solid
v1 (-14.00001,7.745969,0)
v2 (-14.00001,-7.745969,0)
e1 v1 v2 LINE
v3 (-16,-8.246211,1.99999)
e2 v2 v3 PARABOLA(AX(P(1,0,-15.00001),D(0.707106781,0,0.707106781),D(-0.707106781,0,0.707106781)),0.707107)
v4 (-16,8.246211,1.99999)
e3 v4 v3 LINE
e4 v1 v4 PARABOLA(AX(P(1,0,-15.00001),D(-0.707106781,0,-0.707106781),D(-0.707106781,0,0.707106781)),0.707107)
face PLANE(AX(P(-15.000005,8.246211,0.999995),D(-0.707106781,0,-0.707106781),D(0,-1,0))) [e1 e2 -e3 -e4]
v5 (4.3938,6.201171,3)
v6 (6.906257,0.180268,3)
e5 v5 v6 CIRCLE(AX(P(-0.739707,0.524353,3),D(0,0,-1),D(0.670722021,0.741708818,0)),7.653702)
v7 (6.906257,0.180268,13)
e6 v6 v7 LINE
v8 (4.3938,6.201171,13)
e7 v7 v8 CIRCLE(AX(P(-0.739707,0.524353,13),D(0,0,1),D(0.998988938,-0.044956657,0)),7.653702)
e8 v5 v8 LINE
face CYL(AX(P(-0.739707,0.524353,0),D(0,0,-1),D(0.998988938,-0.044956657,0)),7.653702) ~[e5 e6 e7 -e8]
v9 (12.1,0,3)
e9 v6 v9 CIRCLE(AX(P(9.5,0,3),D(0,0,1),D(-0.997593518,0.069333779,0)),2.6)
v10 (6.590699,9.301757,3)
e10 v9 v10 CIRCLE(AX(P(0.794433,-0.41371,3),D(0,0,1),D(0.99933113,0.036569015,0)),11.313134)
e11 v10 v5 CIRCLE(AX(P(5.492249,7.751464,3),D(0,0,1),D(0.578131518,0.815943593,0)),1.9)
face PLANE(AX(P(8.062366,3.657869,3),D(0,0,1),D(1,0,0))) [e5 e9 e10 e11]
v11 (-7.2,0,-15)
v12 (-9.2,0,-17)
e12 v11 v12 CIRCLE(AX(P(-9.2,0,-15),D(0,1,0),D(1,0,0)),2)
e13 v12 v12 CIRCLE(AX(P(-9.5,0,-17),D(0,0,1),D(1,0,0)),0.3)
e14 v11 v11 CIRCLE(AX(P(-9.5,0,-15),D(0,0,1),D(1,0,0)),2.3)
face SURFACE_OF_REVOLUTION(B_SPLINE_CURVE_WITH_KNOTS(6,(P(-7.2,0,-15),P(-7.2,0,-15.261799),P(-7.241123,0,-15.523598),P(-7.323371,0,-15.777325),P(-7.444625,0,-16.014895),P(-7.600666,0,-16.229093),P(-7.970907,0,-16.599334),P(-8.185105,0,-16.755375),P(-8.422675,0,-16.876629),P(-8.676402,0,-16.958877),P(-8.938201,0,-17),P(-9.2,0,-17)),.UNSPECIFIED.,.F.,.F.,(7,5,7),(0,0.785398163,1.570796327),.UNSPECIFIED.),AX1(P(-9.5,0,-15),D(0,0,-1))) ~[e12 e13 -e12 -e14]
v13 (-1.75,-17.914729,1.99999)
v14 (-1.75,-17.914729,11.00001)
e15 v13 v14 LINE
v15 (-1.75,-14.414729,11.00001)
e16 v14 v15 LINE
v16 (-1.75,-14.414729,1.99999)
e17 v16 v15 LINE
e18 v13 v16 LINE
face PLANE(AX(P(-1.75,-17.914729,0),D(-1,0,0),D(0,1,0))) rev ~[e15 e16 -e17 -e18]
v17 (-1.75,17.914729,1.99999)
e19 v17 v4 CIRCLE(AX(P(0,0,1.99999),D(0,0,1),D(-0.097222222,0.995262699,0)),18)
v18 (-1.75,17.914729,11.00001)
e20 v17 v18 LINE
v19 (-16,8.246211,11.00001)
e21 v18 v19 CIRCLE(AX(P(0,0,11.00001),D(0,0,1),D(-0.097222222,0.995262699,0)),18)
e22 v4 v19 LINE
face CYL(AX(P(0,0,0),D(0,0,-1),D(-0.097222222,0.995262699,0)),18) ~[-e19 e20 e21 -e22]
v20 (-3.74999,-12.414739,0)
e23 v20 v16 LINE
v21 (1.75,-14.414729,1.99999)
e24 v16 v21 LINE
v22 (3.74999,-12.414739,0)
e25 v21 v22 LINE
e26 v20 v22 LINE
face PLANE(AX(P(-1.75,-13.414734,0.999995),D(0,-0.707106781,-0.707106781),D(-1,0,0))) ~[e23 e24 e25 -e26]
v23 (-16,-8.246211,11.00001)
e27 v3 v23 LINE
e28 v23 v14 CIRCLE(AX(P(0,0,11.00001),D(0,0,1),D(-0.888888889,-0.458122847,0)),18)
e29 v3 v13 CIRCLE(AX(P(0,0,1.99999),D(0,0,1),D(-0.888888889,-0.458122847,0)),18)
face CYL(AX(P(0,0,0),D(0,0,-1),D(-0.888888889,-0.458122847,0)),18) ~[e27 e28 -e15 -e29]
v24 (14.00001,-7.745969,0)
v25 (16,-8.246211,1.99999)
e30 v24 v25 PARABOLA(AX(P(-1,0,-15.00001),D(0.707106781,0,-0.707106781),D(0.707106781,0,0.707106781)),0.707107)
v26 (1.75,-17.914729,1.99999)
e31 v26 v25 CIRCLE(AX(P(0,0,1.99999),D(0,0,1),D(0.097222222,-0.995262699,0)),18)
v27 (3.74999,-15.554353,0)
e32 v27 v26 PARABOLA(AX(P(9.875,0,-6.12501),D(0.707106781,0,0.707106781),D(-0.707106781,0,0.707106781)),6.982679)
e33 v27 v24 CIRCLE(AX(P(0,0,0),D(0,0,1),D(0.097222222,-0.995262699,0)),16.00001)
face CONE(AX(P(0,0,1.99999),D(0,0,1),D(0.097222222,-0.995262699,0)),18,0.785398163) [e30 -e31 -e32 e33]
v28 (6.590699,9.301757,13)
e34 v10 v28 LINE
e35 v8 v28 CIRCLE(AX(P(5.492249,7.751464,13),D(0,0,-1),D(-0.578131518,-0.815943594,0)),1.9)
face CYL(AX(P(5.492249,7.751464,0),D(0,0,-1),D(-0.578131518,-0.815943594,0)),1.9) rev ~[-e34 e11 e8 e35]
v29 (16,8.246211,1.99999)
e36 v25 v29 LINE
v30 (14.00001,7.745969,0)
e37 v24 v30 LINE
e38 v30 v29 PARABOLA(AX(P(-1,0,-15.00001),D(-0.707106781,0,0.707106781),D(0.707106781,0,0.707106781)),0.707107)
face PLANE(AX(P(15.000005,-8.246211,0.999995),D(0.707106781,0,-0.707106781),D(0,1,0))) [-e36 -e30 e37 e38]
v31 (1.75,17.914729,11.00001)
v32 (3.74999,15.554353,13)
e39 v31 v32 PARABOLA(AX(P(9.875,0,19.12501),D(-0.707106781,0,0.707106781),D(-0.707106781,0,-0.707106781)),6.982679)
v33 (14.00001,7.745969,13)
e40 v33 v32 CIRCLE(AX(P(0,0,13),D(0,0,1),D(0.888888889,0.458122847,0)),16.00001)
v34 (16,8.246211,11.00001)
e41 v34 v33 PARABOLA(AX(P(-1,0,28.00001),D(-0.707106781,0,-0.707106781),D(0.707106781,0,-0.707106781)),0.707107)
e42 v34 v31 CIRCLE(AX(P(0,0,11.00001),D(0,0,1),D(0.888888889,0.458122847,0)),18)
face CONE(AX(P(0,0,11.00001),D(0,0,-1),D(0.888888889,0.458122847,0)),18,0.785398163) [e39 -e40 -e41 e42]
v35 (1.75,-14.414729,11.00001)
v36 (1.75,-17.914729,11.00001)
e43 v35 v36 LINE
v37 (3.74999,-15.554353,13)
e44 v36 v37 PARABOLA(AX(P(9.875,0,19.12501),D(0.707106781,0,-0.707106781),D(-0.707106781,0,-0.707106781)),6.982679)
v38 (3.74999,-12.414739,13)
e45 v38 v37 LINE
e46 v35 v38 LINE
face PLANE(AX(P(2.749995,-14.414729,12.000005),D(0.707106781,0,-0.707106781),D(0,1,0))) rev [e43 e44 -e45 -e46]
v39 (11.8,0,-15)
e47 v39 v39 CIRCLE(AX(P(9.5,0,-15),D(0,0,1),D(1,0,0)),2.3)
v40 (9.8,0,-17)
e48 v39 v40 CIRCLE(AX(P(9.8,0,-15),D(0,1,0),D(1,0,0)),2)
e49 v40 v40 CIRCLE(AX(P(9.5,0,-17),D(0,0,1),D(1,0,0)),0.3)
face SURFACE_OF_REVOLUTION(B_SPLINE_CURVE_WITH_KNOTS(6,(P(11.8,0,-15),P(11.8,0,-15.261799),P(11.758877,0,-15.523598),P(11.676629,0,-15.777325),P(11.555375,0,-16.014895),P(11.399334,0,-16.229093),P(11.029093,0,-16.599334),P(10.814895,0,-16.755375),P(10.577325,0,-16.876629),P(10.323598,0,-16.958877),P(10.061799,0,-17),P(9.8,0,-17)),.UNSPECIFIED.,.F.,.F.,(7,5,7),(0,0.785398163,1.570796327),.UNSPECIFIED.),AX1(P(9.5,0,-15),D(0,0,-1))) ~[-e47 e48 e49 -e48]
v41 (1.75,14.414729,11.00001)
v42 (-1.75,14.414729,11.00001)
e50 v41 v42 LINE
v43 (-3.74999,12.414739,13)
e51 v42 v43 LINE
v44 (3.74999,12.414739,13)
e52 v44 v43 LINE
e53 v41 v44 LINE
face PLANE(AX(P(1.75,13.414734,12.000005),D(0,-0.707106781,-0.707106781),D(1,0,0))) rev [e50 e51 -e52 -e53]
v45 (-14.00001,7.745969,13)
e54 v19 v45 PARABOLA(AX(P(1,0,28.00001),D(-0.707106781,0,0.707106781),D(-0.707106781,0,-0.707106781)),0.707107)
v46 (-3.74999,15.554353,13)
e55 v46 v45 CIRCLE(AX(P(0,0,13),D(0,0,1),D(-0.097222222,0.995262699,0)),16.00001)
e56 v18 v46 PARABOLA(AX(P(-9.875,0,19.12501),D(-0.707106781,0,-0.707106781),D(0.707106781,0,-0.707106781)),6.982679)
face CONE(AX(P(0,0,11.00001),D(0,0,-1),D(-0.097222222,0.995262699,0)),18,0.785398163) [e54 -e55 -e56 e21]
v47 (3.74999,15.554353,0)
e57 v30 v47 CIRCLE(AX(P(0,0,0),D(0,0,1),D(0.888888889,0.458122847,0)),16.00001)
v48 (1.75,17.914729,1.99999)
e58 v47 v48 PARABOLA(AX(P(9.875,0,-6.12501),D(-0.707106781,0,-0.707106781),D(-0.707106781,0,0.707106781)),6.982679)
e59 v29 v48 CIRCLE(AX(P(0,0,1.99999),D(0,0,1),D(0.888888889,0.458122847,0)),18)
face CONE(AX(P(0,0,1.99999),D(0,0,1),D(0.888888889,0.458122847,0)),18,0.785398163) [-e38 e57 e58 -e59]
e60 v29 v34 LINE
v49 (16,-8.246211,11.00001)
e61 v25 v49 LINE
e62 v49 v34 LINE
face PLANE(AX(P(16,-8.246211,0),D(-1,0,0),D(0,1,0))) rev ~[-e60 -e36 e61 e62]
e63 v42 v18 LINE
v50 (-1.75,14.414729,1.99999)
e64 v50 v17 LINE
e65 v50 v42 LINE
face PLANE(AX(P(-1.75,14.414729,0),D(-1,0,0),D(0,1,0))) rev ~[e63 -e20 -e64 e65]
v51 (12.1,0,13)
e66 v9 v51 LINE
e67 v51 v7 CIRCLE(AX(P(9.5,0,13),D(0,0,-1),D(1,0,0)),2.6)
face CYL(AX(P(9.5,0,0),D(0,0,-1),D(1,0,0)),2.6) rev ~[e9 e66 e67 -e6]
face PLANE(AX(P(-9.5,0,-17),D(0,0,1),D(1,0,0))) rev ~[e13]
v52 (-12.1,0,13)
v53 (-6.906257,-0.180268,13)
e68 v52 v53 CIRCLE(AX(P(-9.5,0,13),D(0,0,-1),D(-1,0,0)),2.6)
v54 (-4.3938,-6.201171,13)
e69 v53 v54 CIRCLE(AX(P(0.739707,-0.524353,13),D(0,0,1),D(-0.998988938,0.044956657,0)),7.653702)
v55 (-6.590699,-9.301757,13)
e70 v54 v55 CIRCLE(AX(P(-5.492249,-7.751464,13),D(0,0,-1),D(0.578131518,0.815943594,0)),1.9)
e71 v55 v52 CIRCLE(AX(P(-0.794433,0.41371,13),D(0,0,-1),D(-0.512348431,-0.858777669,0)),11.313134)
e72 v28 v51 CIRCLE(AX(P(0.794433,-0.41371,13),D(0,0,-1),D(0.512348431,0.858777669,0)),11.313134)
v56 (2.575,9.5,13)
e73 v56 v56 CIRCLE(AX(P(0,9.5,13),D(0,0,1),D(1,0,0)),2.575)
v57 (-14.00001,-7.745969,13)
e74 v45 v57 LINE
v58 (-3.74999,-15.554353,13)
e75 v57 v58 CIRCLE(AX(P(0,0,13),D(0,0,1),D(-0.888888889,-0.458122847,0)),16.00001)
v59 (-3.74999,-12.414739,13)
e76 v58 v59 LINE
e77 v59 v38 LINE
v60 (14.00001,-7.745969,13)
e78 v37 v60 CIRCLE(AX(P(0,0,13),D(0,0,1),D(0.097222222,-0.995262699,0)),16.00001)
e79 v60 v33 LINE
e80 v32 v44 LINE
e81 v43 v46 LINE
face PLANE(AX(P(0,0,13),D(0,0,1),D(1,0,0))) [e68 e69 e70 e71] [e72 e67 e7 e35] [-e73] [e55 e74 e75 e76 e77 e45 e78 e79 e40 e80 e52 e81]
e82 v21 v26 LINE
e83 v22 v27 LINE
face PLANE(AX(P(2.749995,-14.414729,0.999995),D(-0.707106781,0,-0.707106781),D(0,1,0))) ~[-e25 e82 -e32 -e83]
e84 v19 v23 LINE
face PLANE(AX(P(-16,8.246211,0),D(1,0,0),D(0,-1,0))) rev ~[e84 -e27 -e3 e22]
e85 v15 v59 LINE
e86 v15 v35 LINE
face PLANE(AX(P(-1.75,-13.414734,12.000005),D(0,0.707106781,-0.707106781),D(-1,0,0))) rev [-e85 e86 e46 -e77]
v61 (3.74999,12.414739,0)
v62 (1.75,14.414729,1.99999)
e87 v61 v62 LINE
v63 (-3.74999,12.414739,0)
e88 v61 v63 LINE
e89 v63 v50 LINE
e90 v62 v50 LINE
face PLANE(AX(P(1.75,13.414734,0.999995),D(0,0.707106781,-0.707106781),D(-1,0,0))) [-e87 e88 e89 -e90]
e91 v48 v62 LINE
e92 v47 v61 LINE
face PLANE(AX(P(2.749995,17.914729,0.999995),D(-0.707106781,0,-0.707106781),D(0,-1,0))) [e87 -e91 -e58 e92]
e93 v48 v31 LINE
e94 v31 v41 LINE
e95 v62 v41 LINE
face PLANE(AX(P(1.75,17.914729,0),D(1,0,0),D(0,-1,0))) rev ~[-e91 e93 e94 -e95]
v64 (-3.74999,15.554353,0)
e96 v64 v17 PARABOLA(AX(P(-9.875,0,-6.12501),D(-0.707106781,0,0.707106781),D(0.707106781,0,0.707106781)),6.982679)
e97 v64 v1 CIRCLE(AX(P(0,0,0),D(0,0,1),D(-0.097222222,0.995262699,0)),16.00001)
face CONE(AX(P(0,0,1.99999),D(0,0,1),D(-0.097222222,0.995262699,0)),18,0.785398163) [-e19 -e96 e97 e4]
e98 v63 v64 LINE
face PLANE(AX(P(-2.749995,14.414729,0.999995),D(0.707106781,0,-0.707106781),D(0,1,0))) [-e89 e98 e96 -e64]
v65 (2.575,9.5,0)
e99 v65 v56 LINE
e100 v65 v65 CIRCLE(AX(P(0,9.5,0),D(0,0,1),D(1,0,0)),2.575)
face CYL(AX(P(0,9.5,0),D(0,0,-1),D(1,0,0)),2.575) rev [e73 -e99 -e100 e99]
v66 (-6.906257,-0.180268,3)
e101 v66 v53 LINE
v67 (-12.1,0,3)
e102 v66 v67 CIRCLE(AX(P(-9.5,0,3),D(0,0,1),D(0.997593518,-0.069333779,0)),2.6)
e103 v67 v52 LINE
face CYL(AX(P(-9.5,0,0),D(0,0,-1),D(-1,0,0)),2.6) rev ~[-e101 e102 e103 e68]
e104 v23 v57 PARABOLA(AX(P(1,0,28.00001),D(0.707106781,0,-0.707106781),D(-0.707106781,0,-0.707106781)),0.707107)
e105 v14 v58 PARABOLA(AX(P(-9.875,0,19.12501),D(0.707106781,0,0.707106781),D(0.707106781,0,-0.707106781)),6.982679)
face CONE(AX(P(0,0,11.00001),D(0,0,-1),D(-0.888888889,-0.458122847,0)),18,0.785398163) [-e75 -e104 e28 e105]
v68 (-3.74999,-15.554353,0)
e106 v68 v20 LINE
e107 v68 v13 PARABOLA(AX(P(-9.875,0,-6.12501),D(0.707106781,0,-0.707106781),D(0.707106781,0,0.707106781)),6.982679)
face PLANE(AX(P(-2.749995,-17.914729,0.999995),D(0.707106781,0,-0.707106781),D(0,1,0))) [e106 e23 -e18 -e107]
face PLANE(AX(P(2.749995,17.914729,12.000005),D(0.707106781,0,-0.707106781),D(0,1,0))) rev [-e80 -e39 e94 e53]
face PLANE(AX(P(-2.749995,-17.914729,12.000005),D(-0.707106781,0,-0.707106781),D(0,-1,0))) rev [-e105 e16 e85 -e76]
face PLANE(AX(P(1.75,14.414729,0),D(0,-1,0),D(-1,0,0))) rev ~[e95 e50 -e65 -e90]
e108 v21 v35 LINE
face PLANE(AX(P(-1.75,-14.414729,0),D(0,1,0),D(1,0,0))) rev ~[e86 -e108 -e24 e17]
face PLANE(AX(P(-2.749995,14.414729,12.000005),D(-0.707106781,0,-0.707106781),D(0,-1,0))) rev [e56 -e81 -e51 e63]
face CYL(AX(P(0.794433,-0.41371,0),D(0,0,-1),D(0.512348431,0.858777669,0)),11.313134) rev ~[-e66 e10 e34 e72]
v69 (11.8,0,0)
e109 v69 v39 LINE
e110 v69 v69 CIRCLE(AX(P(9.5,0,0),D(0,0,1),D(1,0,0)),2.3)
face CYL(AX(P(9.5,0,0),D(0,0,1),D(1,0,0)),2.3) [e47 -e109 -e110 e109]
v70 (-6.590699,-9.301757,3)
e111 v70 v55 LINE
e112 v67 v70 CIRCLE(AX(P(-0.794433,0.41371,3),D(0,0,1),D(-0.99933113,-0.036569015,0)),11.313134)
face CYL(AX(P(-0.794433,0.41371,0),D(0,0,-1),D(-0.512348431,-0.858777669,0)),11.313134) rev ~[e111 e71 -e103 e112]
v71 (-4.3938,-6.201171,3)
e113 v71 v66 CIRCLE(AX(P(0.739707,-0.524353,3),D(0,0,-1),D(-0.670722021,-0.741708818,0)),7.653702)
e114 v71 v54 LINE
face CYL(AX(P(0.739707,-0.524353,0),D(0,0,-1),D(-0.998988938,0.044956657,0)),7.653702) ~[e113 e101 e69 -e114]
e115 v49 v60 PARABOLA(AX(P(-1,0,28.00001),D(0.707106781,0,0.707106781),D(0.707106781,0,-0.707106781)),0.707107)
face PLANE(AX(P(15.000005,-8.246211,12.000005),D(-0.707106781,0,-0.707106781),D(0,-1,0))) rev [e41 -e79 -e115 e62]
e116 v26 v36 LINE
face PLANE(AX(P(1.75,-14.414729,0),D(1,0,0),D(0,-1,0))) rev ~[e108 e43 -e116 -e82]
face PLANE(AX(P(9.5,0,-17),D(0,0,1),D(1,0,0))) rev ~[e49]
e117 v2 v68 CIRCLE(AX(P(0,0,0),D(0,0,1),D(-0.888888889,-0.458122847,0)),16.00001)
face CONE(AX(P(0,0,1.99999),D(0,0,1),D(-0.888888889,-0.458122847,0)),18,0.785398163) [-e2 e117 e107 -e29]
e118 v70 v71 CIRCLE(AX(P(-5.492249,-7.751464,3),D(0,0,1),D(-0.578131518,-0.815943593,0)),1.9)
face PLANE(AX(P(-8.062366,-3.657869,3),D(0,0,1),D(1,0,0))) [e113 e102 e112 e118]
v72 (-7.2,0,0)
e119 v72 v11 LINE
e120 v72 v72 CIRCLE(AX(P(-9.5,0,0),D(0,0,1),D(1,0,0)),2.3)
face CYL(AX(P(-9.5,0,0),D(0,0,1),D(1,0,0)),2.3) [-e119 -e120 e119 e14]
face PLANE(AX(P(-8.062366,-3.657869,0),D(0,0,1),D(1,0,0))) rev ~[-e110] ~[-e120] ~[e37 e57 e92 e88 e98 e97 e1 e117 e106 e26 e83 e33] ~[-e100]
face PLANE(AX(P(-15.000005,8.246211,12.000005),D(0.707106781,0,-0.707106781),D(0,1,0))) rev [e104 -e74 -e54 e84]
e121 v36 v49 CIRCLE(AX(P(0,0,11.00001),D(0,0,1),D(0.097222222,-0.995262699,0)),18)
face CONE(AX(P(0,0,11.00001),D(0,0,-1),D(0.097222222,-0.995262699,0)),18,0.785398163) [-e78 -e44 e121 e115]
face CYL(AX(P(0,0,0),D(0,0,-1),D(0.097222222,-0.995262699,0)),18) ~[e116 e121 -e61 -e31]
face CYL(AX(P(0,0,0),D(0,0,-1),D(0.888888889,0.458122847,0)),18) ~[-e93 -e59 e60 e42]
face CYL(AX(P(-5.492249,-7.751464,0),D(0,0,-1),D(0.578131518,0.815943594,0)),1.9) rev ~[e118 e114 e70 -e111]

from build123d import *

# Parameters (mm, degrees)
F0_R     = 2.575
F1_DEPTH = 13
F0_R_2   = 2.3
F2_DEPTH = 3
F3_DEPTH = 17
F4_R     = 2
F5_SIZE  = 1.99999
F6_SIZE  = 1.99999


# Not quite as in the source:
# - a fillet or chamfer is up to 0.001 mm smaller than in the source, because OpenCascade refuses the exact size


with BuildPart() as f1:
    # F0 (on Top) → F1 (new body)
    with BuildSketch(Plane.XY):
        with BuildLine():
            Line((1.75, -14.4147285773), (1.75, -17.9147285773))
            ThreePointArc((1.75, -17.9147285773), (10.1062199571, -14.895110546), (16, -8.2462112512))
            Line((16, -8.2462112512), (16, 8.2462112512))
            ThreePointArc((16, 8.2462112512), (10.1062199571, 14.895110546), (1.75, 17.9147285773))
            Line((1.75, 17.9147285773), (1.75, 14.4147285773))
            Line((1.75, 14.4147285773), (-1.75, 14.4147285773))
            Line((-1.75, 14.4147285773), (-1.75, 17.9147285773))
            ThreePointArc((-1.75, 17.9147285773), (-10.1062199571, 14.895110546), (-16, 8.2462112512))
            Line((-16, 8.2462112512), (-16, -8.2462112512))
            ThreePointArc((-16, -8.2462112512), (-10.1062199571, -14.895110546), (-1.75, -17.9147285773))
            Line((-1.75, -17.9147285773), (-1.75, -14.4147285773))
            Line((-1.75, -14.4147285773), (1.75, -14.4147285773))
        make_face()
        with BuildLine():
            ThreePointArc((-12.1, 0), (-9.4098118123, 2.5984353159), (-6.9062568532, -0.1802678246))
            ThreePointArc((-6.9062568532, -0.1802678246), (-6.3236870302, -3.4718300474), (-4.3937995375, -6.2011713107))
            ThreePointArc((-4.3937995375, -6.2011713107), (-3.9419565942, -8.8499140227), (-6.5906993063, -9.301756966))
            ThreePointArc((-6.5906993063, -9.301756966), (-10.5283348632, -5.3515440951), (-12.1, 0))
        make_face(mode=Mode.SUBTRACT)
        with BuildLine():
            ThreePointArc((12.1, 0), (9.4098118123, -2.5984353159), (6.9062568532, 0.1802678246))
            ThreePointArc((6.9062568532, 0.1802678246), (6.3236870302, 3.4718300474), (4.3937995375, 6.2011713107))
            ThreePointArc((4.3937995375, 6.2011713107), (3.9419565942, 8.8499140227), (6.5906993063, 9.301756966))
            ThreePointArc((6.5906993063, 9.301756966), (10.5283348632, 5.3515440951), (12.1, 0))
        make_face(mode=Mode.SUBTRACT)
        with Locations((0, 9.5)):
            Circle(F0_R, mode=Mode.SUBTRACT)
    extrude(amount=F1_DEPTH)

    # F0 (on Top) → F2 (join)
    with BuildSketch(Plane.XY):
        with BuildLine():
            ThreePointArc((-4.3937995375, -6.2011713107), (-6.3236870302, -3.4718300474), (-6.9062568532, -0.1802678246))
            ThreePointArc((-6.9062568532, -0.1802678246), (-9.4098118123, 2.5984353159), (-12.1, 0))
            ThreePointArc((-12.1, 0), (-10.5283348632, -5.3515440951), (-6.5906993063, -9.301756966))
            ThreePointArc((-6.5906993063, -9.301756966), (-3.9419565942, -8.8499140227), (-4.3937995375, -6.2011713107))
        make_face()
        with Locations((-9.5, 0)):
            Circle(F0_R_2, mode=Mode.SUBTRACT)
        with Locations((-9.5, 0)):
            Circle(F0_R_2)
        with BuildLine():
            ThreePointArc((4.3937995375, 6.2011713107), (6.3236870302, 3.4718300474), (6.9062568532, 0.1802678246))
            ThreePointArc((6.9062568532, 0.1802678246), (9.4098118123, -2.5984353159), (12.1, 0))
            ThreePointArc((12.1, 0), (10.5283348632, 5.3515440951), (6.5906993063, 9.301756966))
            ThreePointArc((6.5906993063, 9.301756966), (3.9419565942, 8.8499140227), (4.3937995375, 6.2011713107))
        make_face()
        with Locations((9.5, 0)):
            Circle(F0_R_2, mode=Mode.SUBTRACT)
        with Locations((9.5, 0)):
            Circle(F0_R_2)
    extrude(amount=F2_DEPTH)

    # F0 (on Top) → F3 (join)
    with BuildSketch(Plane.XY):
        with Locations((-9.5, 0)):
            Circle(F0_R_2)
        with Locations((9.5, 0)):
            Circle(F0_R_2)
    extrude(amount=-F3_DEPTH)

    # F4
    f4_edges = [f1.edges().sort_by_distance(p)[0] for p in [
        (-11.8, 0, -17),
        (7.2, 0, -17),
    ]]
    fillet(f4_edges, radius=F4_R)

    # F5 (size 2 in the source; OpenCascade refuses exactly that, so slightly less here)
    f5_edges = [f1.edges().sort_by_distance(p)[0] for p in [
        (10.10622, 14.895111, 13),
        (16, 0, 13),
        (10.10622, -14.895111, 13),
        (1.75, -16.164729, 13),
        (0, -14.414729, 13),
        (-1.75, -16.164729, 13),
        (-10.10622, -14.895111, 13),
        (-16, 0, 13),
        (-10.10622, 14.895111, 13),
        (-1.75, 16.164729, 13),
        (0, 14.414729, 13),
        (1.75, 16.164729, 13),
    ]]
    chamfer(f5_edges, length=F5_SIZE)

    # F6 (size 2 in the source; OpenCascade refuses exactly that, so slightly less here)
    f6_edges = [f1.edges().sort_by_distance(p)[0] for p in [
        (10.10622, 14.895111, 0),
        (16, 0, 0),
        (10.10622, -14.895111, 0),
        (0, 14.414729, 0),
        (1.75, 16.164729, 0),
        (-1.75, 16.164729, 0),
        (-10.10622, 14.895111, 0),
        (-16, 0, 0),
        (-10.10622, -14.895111, 0),
        (-1.75, -16.164729, 0),
        (0, -14.414729, 0),
        (1.75, -16.164729, 0),
    ]]
    chamfer(f6_edges, length=F6_SIZE)


solid = f1.part
